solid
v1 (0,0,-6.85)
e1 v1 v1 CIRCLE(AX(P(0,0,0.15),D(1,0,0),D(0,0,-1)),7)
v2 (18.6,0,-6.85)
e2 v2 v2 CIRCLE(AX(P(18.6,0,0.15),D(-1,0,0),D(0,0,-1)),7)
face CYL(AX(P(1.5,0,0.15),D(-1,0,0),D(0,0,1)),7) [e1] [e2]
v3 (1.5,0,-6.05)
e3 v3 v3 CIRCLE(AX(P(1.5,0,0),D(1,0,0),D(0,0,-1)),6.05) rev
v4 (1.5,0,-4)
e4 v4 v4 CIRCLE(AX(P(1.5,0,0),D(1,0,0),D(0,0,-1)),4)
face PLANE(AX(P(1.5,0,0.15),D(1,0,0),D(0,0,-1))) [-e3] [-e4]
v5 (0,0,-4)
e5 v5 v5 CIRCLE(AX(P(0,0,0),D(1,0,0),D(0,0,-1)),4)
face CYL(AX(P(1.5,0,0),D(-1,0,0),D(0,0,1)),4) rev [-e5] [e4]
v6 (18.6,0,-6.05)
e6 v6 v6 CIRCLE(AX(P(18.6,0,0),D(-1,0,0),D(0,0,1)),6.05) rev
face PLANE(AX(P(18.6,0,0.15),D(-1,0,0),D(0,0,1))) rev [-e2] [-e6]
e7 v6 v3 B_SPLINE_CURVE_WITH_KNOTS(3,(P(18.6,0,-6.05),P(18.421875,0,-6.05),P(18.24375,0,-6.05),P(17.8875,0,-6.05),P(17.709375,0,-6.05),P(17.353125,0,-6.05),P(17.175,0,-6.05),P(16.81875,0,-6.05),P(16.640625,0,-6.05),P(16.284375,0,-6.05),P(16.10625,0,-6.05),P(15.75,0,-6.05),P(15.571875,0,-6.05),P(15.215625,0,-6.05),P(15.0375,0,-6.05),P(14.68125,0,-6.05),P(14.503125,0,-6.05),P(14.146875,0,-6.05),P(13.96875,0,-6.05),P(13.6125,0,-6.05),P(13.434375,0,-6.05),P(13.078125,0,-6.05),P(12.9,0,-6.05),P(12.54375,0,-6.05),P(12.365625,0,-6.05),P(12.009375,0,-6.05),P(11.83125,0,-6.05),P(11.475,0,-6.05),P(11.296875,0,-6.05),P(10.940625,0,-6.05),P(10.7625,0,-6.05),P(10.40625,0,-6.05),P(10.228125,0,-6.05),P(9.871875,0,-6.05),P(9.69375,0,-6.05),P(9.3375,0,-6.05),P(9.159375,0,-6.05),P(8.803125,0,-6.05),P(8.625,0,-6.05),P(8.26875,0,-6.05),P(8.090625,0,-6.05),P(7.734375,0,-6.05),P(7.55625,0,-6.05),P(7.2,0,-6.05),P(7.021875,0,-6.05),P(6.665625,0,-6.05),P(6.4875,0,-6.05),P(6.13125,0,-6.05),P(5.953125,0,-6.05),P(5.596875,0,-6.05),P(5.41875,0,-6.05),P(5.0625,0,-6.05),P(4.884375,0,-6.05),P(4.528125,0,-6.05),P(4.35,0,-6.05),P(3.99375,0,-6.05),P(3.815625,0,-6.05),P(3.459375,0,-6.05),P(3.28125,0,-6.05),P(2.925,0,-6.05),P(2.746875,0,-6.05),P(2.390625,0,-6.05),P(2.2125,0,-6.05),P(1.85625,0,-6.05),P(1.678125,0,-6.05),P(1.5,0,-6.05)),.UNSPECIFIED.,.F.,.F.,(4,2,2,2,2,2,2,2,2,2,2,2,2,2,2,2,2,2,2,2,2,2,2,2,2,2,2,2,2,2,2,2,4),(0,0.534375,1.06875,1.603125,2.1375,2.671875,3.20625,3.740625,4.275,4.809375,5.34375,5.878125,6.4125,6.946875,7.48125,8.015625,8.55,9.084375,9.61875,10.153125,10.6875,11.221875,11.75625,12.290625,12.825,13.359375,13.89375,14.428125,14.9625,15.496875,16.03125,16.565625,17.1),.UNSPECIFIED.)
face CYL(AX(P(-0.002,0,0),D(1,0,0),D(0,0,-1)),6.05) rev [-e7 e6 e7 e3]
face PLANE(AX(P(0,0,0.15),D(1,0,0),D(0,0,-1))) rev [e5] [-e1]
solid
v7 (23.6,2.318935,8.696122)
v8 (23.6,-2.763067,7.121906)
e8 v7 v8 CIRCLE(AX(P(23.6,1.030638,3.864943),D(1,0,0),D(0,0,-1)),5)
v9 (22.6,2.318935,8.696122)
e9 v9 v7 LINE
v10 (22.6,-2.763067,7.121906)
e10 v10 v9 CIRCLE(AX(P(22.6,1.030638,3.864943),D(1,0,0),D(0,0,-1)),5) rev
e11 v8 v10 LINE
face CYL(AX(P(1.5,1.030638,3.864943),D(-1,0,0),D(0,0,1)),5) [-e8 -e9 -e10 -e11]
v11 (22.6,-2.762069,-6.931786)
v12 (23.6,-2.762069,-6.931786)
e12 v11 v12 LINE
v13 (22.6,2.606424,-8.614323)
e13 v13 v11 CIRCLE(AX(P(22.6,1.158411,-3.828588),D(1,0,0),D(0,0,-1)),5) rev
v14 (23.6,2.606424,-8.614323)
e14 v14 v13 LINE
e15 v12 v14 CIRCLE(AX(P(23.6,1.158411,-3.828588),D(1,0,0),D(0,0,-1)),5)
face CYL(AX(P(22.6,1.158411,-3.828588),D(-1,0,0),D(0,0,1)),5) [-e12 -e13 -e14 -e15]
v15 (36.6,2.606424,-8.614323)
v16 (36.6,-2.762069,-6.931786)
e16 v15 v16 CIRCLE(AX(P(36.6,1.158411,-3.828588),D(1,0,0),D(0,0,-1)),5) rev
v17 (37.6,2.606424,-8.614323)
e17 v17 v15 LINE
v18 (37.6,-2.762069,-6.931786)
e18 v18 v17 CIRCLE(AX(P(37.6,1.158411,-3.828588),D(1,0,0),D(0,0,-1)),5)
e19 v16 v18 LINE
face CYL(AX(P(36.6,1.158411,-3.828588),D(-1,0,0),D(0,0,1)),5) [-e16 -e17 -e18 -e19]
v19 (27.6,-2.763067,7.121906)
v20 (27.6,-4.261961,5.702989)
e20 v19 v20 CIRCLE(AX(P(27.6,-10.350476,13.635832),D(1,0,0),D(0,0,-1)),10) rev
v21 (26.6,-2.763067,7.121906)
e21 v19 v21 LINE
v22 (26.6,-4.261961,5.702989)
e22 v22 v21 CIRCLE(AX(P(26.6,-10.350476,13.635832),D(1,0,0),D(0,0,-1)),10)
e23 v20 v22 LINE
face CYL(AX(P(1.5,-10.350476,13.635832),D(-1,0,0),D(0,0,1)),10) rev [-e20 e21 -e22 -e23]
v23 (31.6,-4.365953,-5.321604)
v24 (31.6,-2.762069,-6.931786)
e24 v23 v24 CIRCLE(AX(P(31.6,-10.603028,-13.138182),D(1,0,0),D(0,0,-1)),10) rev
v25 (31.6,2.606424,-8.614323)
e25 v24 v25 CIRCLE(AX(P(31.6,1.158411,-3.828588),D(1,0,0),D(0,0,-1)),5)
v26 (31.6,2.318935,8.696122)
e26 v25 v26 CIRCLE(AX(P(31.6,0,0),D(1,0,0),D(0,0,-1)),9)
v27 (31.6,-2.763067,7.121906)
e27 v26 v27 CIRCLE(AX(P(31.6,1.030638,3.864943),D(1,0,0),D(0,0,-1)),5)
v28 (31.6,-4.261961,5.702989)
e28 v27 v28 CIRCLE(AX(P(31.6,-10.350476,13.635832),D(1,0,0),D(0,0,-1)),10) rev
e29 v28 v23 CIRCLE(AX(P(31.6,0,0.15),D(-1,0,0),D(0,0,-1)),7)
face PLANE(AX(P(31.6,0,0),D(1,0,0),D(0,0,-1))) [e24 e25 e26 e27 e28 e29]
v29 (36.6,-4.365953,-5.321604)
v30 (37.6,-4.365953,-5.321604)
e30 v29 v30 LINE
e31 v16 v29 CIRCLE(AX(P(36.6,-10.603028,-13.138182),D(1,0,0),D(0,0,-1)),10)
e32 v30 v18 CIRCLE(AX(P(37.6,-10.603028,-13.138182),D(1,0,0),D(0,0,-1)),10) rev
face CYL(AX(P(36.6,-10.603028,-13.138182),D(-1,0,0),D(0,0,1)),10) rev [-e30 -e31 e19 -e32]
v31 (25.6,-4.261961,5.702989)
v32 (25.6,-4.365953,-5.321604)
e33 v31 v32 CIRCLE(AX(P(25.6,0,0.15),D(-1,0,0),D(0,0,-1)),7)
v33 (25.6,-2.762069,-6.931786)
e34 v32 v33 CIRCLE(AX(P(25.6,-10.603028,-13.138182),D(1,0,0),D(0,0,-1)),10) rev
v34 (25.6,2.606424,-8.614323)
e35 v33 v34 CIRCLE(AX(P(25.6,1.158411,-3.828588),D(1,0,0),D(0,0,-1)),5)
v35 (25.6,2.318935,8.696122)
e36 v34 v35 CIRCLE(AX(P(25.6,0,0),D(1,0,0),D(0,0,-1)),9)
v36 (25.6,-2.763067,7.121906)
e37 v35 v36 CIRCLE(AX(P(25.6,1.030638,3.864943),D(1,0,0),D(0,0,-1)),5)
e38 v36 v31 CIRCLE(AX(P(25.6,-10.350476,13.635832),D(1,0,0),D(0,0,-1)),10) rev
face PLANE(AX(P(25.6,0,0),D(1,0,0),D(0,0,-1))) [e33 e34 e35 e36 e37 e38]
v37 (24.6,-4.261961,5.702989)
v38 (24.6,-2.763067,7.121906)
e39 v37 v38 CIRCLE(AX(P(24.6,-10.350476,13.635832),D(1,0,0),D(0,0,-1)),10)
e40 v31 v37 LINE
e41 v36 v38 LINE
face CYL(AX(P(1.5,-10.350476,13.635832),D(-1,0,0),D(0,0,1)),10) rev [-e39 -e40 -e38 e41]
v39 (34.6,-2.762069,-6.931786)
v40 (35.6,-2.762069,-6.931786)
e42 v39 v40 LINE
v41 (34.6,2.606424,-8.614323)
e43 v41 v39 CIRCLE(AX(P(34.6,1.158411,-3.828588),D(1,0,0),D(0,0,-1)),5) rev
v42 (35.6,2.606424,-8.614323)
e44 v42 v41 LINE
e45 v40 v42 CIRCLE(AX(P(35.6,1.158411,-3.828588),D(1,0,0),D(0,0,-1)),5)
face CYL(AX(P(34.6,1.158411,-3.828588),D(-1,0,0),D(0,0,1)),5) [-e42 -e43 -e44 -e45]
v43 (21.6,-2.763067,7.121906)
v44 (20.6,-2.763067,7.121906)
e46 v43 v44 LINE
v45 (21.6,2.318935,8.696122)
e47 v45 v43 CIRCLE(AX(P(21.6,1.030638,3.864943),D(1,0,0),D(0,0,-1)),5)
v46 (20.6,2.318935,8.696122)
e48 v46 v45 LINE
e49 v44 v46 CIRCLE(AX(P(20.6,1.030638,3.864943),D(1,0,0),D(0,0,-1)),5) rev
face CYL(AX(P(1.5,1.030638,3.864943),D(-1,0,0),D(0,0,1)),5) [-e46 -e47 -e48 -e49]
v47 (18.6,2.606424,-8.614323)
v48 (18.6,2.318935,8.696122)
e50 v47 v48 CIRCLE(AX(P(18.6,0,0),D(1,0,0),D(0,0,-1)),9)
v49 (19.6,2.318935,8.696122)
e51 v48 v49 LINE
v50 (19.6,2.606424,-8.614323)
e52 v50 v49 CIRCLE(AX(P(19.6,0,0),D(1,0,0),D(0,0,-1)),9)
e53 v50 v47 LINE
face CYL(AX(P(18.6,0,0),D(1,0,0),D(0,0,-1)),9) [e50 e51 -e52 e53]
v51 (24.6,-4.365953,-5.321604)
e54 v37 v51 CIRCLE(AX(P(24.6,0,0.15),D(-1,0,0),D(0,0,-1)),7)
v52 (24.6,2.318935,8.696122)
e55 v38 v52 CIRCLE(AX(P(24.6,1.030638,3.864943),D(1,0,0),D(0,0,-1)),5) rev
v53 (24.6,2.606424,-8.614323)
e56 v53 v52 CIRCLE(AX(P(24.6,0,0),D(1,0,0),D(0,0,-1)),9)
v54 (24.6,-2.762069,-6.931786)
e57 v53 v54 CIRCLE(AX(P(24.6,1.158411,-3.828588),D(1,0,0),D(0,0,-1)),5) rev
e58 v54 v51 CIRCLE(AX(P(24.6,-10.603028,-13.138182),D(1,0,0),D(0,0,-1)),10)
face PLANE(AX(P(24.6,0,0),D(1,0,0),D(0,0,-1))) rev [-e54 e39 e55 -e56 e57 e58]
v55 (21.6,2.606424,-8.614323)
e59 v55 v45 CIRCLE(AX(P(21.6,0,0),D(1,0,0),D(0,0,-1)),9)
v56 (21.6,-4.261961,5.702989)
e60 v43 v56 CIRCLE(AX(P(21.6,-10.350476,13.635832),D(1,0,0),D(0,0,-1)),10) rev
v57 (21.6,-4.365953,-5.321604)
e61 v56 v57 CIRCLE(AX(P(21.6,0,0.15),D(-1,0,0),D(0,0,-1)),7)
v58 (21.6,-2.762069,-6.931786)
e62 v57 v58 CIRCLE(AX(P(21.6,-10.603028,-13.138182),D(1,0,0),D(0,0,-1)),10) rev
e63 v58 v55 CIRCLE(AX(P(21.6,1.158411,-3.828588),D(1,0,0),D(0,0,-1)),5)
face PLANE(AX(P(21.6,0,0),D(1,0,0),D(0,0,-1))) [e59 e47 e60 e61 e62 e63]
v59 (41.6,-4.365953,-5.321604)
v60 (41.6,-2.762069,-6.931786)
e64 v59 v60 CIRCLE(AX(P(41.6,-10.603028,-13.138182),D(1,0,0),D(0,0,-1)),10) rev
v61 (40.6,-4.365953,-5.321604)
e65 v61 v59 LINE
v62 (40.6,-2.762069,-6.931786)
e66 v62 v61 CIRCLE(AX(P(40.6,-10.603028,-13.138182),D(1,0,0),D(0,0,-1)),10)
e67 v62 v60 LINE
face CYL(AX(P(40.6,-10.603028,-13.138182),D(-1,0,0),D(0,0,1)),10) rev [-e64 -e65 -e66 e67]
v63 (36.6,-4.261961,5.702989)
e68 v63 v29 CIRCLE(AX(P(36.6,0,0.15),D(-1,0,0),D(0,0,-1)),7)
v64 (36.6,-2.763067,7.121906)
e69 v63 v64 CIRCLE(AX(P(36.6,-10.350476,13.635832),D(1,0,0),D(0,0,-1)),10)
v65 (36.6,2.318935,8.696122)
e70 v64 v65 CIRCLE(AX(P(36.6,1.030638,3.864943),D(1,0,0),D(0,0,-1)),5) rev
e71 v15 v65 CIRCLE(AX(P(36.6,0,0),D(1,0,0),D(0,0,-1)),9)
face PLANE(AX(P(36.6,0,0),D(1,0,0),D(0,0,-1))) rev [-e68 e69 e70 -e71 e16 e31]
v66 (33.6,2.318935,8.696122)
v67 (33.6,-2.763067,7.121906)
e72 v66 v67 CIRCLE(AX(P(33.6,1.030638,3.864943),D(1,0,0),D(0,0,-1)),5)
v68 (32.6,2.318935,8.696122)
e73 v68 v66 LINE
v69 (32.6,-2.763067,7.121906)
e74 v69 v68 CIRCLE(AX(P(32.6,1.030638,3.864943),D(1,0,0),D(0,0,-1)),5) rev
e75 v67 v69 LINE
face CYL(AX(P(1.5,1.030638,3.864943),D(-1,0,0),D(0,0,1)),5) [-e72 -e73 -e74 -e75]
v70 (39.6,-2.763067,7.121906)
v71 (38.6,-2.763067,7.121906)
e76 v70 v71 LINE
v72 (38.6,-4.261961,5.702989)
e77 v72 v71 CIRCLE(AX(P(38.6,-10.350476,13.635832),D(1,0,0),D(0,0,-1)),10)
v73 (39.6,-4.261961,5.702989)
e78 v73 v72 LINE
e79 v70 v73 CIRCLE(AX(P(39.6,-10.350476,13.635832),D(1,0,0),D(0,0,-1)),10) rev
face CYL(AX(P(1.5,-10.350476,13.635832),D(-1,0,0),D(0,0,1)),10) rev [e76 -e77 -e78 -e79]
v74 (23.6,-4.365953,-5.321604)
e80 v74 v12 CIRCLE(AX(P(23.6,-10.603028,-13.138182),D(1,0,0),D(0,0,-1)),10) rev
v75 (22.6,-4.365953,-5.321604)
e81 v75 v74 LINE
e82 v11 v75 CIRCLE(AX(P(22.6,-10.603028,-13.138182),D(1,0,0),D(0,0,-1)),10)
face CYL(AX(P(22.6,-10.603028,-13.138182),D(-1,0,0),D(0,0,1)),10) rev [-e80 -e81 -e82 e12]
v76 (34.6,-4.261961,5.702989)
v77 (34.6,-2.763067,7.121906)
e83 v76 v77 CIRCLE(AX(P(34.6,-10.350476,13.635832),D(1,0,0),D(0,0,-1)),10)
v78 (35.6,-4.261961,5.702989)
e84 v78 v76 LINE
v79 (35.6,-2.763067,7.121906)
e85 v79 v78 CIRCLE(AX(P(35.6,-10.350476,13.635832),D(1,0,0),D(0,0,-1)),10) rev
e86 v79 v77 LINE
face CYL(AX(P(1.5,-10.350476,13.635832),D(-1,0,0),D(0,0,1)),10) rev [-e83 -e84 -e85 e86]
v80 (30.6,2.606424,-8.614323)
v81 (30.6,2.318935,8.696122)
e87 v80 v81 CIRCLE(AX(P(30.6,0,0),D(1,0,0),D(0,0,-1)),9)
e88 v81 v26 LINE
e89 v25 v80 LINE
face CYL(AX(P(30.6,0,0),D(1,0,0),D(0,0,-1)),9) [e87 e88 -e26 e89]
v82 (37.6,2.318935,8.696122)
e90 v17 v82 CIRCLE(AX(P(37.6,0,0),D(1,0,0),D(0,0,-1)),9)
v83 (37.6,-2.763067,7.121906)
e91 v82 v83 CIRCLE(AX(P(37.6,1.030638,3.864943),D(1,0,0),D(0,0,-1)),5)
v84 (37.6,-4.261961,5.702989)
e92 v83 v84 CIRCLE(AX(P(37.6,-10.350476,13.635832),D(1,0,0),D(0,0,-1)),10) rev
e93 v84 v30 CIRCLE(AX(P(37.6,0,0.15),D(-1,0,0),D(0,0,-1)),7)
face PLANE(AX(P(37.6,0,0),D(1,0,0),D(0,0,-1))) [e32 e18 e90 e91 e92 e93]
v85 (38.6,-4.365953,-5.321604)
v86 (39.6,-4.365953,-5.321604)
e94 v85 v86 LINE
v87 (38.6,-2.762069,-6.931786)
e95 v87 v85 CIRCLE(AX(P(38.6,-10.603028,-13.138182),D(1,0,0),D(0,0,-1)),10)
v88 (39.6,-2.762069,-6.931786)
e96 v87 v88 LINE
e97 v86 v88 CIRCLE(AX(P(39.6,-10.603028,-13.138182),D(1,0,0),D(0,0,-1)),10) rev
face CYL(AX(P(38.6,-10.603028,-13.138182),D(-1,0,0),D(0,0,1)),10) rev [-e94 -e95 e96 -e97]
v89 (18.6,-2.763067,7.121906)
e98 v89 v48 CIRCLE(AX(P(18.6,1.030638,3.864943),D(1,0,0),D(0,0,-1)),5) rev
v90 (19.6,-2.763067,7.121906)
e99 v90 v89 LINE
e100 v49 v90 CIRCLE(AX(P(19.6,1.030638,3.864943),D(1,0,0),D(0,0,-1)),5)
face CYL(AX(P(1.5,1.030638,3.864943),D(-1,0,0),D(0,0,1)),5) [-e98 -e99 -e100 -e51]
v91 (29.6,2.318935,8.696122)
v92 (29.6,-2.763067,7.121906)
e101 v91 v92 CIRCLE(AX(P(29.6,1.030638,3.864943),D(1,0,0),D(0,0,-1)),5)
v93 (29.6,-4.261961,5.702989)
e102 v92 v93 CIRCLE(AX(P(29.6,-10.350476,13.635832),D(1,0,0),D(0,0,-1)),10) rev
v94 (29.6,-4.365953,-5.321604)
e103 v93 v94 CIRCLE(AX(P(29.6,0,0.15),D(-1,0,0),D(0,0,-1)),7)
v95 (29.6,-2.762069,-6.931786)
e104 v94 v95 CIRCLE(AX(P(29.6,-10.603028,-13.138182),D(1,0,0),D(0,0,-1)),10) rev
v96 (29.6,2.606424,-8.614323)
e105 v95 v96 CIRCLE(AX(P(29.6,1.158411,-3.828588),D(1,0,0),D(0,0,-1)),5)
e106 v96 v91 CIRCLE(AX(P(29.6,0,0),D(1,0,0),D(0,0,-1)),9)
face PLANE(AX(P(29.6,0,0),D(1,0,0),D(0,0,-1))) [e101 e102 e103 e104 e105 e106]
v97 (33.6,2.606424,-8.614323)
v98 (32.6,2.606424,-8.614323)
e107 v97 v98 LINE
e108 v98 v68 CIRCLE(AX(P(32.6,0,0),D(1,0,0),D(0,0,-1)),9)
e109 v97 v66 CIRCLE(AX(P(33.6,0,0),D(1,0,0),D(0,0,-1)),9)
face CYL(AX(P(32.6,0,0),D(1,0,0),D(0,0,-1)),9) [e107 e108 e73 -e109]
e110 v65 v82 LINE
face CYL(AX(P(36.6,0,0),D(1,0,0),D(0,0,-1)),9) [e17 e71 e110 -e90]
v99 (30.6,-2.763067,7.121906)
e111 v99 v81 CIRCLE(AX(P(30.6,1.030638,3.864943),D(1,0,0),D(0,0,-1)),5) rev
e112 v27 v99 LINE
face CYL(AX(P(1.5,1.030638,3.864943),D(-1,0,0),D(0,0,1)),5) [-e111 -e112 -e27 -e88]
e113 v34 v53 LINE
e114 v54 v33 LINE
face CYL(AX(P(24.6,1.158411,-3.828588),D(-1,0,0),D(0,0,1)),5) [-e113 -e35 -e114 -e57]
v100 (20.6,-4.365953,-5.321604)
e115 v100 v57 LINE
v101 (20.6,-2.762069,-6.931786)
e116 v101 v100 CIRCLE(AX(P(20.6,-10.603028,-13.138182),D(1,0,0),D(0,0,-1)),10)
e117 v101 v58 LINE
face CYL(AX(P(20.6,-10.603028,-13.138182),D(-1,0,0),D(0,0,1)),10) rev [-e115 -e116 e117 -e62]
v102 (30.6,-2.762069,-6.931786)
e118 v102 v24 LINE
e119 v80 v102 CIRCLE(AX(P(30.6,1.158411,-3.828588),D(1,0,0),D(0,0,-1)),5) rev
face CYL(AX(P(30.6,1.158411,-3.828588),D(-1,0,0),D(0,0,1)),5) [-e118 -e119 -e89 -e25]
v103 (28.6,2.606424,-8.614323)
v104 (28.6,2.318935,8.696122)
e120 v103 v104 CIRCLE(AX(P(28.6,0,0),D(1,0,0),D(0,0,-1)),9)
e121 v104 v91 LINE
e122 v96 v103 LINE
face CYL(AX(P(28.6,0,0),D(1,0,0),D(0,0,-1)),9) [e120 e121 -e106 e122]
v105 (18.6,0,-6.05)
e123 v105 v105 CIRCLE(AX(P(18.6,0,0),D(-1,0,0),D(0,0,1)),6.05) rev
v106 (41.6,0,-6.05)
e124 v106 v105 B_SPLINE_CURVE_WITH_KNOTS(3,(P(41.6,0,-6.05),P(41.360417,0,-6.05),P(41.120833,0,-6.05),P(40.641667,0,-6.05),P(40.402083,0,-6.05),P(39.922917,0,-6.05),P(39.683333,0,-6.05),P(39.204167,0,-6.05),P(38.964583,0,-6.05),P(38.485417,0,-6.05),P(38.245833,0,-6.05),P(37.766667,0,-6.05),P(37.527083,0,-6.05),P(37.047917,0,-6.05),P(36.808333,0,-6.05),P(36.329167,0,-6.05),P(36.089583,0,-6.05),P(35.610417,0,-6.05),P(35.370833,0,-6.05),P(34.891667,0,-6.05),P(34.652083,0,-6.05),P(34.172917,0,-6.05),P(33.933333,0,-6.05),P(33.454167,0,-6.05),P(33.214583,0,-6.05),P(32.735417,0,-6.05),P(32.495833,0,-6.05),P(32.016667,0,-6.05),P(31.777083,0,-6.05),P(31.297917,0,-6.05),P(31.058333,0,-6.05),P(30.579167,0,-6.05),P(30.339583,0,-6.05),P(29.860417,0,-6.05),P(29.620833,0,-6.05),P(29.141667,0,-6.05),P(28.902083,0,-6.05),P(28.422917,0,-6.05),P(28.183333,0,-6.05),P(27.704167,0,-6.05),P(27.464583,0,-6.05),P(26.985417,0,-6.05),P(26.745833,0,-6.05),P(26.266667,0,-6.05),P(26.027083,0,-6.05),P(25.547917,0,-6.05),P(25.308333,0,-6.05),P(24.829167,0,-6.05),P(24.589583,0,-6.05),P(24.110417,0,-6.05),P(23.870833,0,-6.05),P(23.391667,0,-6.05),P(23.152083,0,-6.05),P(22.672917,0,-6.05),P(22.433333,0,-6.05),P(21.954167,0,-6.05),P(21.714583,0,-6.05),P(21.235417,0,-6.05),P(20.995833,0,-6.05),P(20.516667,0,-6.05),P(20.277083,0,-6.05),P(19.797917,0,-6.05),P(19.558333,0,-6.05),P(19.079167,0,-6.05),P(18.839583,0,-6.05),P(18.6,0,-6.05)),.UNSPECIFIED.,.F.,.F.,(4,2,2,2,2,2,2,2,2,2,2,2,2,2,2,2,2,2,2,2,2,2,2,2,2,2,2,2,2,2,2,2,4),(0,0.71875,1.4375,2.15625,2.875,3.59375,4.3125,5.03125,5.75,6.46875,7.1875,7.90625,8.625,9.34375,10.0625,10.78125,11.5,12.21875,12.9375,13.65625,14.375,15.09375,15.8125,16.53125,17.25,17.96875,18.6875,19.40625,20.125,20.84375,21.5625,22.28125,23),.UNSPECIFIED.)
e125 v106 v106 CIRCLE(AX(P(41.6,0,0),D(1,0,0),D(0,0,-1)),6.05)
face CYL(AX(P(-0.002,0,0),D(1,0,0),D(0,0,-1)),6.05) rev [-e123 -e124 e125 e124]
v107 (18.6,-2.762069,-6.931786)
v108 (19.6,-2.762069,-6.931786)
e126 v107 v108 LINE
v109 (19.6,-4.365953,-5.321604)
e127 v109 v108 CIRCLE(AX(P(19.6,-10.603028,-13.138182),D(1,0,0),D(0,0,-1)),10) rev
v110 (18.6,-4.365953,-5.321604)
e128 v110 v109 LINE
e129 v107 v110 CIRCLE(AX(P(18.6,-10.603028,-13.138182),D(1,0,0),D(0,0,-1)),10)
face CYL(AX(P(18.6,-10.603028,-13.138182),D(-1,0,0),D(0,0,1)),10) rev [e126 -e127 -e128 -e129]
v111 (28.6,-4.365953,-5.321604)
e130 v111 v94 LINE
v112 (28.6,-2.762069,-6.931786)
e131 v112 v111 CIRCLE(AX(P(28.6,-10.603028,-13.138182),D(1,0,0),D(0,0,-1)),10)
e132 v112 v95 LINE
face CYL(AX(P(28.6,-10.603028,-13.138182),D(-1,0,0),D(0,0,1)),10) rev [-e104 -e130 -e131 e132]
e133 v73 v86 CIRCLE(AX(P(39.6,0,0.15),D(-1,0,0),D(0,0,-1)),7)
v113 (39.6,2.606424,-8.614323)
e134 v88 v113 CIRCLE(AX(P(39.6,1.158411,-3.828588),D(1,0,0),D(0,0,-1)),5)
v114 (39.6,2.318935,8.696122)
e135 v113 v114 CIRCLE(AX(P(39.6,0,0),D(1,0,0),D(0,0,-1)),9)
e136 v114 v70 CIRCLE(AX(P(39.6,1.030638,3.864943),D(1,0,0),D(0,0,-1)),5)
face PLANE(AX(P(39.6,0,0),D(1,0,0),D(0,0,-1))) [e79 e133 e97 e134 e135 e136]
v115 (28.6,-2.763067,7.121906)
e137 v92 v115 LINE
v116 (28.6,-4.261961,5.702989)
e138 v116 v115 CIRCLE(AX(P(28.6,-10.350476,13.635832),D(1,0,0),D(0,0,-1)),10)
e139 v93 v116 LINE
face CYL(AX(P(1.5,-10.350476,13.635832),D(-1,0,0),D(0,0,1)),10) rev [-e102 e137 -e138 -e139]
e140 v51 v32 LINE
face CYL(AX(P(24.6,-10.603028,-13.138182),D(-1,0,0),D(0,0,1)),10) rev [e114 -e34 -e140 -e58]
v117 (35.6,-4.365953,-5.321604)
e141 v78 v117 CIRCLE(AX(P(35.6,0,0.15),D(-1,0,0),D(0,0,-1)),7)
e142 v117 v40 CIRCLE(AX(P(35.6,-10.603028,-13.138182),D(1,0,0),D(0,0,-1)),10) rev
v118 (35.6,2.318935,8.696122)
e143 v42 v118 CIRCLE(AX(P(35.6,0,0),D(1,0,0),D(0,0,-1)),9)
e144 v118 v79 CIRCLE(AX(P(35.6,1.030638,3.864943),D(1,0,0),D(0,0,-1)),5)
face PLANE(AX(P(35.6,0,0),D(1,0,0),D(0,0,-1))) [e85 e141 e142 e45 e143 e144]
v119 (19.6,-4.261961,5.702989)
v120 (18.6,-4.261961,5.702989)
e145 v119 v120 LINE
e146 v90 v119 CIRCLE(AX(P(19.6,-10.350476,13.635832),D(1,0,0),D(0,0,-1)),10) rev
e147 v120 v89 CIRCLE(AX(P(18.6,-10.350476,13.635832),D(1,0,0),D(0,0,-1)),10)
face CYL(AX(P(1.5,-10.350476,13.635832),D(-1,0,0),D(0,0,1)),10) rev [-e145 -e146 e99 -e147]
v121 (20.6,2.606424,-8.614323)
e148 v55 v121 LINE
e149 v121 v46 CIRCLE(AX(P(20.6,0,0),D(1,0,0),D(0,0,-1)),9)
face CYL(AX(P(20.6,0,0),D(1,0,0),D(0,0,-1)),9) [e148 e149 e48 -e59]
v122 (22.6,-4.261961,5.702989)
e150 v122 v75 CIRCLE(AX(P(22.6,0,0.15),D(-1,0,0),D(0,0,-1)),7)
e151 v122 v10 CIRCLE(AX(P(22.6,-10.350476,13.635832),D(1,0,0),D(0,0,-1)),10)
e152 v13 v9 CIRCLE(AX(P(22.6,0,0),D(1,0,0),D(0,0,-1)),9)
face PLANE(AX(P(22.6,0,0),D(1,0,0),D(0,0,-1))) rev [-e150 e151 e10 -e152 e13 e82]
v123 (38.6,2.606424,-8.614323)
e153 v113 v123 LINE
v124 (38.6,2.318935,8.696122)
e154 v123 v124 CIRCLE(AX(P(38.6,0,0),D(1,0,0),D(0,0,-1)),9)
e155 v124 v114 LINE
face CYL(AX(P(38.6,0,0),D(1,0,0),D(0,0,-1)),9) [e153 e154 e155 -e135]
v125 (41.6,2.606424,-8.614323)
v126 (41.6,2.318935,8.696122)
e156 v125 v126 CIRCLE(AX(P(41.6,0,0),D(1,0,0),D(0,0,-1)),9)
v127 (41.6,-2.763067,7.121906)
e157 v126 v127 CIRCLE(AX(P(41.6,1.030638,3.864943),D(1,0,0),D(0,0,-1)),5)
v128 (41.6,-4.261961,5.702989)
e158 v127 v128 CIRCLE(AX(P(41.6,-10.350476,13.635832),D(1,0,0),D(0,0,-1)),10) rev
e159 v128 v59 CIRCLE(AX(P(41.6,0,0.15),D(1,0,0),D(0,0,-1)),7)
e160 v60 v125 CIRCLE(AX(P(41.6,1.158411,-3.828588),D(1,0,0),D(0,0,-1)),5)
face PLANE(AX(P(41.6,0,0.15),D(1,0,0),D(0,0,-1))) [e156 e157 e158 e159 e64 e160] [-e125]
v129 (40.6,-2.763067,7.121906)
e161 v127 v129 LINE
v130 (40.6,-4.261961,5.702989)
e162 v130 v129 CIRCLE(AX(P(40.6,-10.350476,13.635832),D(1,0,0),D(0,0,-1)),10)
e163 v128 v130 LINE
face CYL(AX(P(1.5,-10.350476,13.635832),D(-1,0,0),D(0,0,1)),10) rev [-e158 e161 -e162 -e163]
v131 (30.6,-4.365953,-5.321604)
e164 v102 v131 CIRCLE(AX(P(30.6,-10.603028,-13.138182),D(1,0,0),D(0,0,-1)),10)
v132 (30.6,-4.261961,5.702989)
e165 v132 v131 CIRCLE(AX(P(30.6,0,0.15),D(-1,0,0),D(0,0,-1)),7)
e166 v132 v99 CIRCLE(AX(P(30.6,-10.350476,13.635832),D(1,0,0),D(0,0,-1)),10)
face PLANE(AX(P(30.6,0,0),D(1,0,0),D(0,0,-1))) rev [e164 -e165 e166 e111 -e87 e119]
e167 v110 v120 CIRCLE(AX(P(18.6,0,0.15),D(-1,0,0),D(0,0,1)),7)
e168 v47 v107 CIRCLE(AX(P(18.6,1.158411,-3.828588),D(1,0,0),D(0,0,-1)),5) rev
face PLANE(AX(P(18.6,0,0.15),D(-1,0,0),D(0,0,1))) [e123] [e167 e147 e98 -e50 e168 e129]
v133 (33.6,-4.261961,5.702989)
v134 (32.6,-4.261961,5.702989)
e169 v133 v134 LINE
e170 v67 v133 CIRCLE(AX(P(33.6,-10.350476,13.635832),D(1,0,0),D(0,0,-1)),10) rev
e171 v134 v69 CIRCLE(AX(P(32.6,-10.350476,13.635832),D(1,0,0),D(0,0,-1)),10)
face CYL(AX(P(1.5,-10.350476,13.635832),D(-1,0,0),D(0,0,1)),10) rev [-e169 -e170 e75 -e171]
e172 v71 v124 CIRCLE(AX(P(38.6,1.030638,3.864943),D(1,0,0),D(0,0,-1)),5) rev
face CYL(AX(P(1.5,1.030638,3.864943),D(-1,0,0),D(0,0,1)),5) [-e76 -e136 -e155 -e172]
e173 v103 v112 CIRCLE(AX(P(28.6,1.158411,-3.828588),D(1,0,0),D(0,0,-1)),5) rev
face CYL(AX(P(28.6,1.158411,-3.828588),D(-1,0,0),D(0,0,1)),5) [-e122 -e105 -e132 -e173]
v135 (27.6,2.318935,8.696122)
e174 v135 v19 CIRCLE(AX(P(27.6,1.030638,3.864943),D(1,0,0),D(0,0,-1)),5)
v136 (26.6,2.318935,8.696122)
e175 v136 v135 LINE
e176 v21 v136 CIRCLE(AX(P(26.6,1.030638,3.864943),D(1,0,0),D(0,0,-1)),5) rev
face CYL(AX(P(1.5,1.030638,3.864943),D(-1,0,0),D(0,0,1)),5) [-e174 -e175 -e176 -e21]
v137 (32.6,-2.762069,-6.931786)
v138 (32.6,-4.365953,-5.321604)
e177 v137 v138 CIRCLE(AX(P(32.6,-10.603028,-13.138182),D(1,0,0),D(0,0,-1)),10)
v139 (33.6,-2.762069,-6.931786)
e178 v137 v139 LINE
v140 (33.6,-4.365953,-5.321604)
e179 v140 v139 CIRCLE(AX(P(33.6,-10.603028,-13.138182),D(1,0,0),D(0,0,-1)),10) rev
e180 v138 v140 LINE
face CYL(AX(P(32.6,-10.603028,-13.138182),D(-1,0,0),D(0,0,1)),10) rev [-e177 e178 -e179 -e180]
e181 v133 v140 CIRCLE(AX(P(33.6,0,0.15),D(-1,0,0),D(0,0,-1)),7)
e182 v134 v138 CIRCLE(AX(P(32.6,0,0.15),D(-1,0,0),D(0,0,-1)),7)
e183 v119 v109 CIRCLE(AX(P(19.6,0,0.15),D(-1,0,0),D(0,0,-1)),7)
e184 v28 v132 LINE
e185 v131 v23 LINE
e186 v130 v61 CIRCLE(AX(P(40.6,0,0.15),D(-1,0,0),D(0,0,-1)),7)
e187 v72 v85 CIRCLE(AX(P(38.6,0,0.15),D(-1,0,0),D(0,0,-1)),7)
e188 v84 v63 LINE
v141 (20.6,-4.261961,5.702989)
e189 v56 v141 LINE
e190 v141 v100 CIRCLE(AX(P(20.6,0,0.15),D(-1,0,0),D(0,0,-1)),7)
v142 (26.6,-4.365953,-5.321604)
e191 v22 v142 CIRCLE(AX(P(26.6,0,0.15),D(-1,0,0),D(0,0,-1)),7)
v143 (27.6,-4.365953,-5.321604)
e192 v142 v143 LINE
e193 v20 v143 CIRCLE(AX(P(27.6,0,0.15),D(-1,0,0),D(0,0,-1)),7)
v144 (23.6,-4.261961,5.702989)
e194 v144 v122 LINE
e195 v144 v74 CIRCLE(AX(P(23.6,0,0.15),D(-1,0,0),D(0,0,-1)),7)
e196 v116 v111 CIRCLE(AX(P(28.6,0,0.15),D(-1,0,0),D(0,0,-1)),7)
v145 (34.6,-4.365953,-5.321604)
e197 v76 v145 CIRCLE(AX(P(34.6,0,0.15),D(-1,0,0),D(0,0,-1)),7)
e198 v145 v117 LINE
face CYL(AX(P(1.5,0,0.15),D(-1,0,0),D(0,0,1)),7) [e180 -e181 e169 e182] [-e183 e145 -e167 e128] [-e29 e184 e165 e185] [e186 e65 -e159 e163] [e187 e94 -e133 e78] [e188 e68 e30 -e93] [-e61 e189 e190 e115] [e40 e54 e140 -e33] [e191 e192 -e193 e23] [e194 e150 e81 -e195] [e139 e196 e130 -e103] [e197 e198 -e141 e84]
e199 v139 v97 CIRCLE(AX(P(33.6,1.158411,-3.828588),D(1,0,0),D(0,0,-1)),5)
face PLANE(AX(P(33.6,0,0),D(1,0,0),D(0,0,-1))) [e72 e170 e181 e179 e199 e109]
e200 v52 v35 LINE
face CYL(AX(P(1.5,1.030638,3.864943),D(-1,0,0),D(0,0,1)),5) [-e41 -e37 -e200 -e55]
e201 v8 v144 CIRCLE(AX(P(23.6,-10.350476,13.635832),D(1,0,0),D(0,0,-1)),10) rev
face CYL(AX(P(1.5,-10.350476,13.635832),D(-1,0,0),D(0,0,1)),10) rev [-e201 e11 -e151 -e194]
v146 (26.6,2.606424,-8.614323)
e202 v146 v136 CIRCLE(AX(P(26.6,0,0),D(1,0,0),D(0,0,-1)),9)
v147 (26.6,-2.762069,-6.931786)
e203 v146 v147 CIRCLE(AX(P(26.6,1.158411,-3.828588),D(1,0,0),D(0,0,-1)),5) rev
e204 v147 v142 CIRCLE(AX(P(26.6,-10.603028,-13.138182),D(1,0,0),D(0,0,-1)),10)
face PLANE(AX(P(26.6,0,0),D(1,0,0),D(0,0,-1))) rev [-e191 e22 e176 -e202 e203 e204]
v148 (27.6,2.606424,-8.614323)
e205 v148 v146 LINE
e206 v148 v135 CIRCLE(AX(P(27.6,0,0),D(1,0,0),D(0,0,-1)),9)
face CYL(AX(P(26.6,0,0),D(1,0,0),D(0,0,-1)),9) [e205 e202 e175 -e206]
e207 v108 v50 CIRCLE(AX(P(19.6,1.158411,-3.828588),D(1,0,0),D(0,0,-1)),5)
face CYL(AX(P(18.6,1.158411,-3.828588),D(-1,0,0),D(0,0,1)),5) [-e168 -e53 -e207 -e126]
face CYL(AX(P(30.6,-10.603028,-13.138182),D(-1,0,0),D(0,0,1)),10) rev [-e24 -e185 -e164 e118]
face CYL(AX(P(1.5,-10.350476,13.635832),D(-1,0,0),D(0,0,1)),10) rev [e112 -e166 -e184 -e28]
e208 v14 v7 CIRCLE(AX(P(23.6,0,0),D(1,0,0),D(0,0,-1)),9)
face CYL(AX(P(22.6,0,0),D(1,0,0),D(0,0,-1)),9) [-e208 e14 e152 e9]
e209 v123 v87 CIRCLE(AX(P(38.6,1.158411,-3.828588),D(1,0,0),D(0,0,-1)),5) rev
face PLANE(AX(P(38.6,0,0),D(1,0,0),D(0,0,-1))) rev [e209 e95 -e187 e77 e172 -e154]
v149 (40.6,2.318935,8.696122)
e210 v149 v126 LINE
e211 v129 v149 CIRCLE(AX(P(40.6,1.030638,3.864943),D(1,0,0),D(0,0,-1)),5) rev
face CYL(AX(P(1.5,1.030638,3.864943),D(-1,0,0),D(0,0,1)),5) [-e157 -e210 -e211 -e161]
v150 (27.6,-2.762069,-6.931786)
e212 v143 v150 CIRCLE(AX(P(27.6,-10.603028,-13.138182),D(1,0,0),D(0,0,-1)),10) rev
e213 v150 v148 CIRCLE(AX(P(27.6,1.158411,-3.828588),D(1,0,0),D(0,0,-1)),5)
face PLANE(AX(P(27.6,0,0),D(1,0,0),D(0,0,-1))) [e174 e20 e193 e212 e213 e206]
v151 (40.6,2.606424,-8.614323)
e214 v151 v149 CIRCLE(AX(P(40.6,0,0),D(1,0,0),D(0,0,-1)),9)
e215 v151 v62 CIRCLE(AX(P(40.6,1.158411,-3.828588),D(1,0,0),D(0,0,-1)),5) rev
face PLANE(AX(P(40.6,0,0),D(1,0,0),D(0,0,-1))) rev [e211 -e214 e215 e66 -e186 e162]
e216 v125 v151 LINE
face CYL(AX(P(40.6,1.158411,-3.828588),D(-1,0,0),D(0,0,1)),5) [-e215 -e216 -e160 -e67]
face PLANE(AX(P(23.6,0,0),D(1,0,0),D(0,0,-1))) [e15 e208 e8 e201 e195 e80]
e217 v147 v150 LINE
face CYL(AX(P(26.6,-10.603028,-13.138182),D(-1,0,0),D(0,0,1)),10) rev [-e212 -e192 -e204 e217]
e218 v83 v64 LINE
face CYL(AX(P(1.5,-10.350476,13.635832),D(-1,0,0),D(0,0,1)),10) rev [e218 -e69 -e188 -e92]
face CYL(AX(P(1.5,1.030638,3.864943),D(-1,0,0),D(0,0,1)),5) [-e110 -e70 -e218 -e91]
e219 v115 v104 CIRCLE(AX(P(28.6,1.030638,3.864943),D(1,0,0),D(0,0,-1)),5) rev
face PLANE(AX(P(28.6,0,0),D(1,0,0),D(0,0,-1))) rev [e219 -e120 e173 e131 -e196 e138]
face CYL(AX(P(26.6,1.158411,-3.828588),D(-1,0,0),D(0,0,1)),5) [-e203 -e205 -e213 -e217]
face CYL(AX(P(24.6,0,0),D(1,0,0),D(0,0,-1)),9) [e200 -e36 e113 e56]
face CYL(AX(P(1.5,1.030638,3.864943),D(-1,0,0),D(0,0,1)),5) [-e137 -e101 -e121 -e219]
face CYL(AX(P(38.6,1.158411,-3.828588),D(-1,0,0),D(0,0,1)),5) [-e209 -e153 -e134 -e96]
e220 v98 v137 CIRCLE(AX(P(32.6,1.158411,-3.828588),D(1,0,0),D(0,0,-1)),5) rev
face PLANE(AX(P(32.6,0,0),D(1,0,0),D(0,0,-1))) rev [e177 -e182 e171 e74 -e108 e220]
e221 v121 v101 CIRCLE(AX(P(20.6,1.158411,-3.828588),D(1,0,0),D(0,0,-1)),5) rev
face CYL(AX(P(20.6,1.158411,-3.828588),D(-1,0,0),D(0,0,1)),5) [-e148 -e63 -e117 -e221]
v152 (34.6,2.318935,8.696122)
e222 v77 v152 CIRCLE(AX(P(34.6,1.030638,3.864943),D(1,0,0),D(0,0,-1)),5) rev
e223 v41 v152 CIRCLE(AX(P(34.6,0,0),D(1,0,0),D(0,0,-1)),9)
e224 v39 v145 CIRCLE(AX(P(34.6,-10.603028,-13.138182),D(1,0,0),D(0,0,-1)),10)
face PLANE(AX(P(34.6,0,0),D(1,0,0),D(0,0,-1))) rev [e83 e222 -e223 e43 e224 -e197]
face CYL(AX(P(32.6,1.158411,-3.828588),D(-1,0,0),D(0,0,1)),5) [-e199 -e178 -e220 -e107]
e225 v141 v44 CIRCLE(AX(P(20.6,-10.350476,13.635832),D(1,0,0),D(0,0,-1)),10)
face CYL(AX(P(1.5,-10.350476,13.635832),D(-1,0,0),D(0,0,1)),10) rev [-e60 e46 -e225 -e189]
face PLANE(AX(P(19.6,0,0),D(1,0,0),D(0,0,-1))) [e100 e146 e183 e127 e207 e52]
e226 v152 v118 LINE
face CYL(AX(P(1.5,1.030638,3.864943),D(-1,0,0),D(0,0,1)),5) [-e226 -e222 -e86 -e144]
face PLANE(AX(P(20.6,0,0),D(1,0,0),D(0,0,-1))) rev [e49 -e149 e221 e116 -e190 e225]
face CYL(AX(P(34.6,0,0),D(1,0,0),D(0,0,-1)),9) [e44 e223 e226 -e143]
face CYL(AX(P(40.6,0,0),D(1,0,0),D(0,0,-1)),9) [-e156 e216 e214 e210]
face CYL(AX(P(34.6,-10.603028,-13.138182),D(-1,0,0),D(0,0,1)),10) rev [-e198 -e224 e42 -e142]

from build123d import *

# Parameters (mm, degrees)
SKETCH1_R           = 7
SKETCH1_R_2         = 4
BOSS_EXTRUDE1_DEPTH = 1.5
SKETCH2_R           = 7
SKETCH2_R_2         = 6.4
BOSS_EXTRUDE2_DEPTH = 40.1
BOSS_EXTRUDE5_REACH = 44.786
SKETCH12_R          = 6.4
SKETCH12_R_2        = 6.05
BOSS_EXTRUDE7_START = -1
BOSS_EXTRUDE7_DEPTH = 1
FILLET2_R           = 10
FILLET3_R           = 5
LPATTERN1_START     = 18.6
LPATTERN1_DEPTH     = 1
LPATTERN1_START_2   = 20.6
LPATTERN1_2_DEPTH   = 1
LPATTERN1_START_3   = 22.6
LPATTERN1_3_DEPTH   = 1
LPATTERN1_START_4   = 24.6
LPATTERN1_4_DEPTH   = 1
LPATTERN1_START_5   = 26.6
LPATTERN1_5_DEPTH   = 1
LPATTERN1_START_6   = 28.6
LPATTERN1_6_DEPTH   = 1
LPATTERN1_START_7   = 30.6
LPATTERN1_7_DEPTH   = 1
LPATTERN1_START_8   = 32.6
LPATTERN1_8_DEPTH   = 1
LPATTERN1_START_9   = 34.6
LPATTERN1_9_DEPTH   = 1
LPATTERN1_START_10  = 36.6
LPATTERN1_10_DEPTH  = 1
LPATTERN1_START_11  = 38.6
LPATTERN1_11_DEPTH  = 1
SKETCH15_R          = 7


# Read off the part's stored shape, not the designer's step: LPattern1
with BuildPart() as part:
    # Sketch1 → Boss-Extrude1 (new body)
    with BuildSketch(Plane(origin=(0, 0, 0), x_dir=(0, 0, -1), z_dir=(1, 0, 0))):
        with Locations((-0.15, 0)):
            Circle(SKETCH1_R)
        Circle(SKETCH1_R_2, mode=Mode.SUBTRACT)
    extrude(amount=BOSS_EXTRUDE1_DEPTH)

    # Sketch2 → Boss-Extrude2 (add)
    with BuildSketch(Plane(origin=(1.5, 0, 0), x_dir=(0, 0, -1), z_dir=(1, 0, 0))):
        with Locations((-0.15, 0)):
            Circle(SKETCH2_R)
        with Locations((-0.15, 0)):
            Circle(SKETCH2_R_2, mode=Mode.SUBTRACT)
    extrude(amount=BOSS_EXTRUDE2_DEPTH)

    # Sketch12 → Boss-Extrude5 (add, up to next)
    with BuildSketch(Plane(origin=(41.6, 0, 0), x_dir=(0, 0, -1), z_dir=(1, 0, 0)), mode=Mode.PRIVATE) as boss_extrude5_sk1:
        with Locations((-0.15, 0)):
            Circle(SKETCH12_R)
        Circle(SKETCH12_R_2, mode=Mode.SUBTRACT)
    boss_extrude5_tool1 = extrude(boss_extrude5_sk1.sketch, amount=-BOSS_EXTRUDE5_REACH, mode=Mode.PRIVATE) - part.part
    add(boss_extrude5_tool1.solids().sort_by_distance((41.6, 0, 6.368981))[0])

    # Sketch14 → Boss-Extrude7 (add)
    with BuildSketch(Plane(origin=(41.6, 0, 0), x_dir=(0, 0, -1), z_dir=(1, 0, 0)).offset(BOSS_EXTRUDE7_START)):
        with BuildLine():
            Line((-7.039083492, -1.241180339), (-8.863269777, -1.562833599))
            ThreePointArc((-8.863269777, -1.562833599), (0, 9), (8.863269777, -1.562833599))
            Line((8.863269777, -1.562833599), (6.748129599, -1.189877318))
            ThreePointArc((6.748129599, -1.189877318), (-0.176047227, 6.999951539), (-7.039083492, -1.241180339))
        make_face()
    extrude(amount=BOSS_EXTRUDE7_DEPTH)

    # Fillet2
    # the kernel refuses this fillet: 10 mm, written as the material it adds along each edge
    with BuildSketch(Plane(origin=(40.6, -1.189877318, -6.748129599), x_dir=(0, -0.9122124275498228, 0.409717569825434), z_dir=(1, 0, 0))) as fillet2_piece_1:
        with BuildLine():
            CenterArc((5.968676638, 9.685818843), FILLET2_R, 229.495547536, 26.104158306)
            Line((-0.526394739, 2.082263897), (-0.656296166, 1.930192799))
            ThreePointArc((-0.656296166, 1.930192799), (-0.457097485, 0.992114146), (-0.193900116, -0.049017803))
            Line((-0.193900116, -0.049017803), (0.049738972, -0.193716377))
            ThreePointArc((0.049738972, -0.193716377), (1.740864019, 0.01992681), (3.431989067, -0.193716377))
            Line((3.431989067, -0.193716377), (3.481728039, 0))
        make_face()
    extrude(amount=1)
    with BuildSketch(Plane(origin=(40.6, -1.241180339, 7.039083492), x_dir=(0, -0.9145376119425217, -0.4045008731047063), z_dir=(1, 0, 0))) as fillet2_piece_2:
        with BuildLine():
            CenterArc((5.662402917, -9.717692138), FILLET2_R, 103.646653122, 23.987142505)
            Line((-0.443720941, -1.798395993), (-0.565843418, -1.64001007))
            ThreePointArc((-0.565843418, -1.64001007), (-0.416037384, -0.851288435), (-0.194176914, 0.047909561))
            Line((-0.194176914, 0.047909561), (0.047186691, 0.194353843))
            ThreePointArc((0.047186691, 0.194353843), (1.651534184, 0.002384497), (3.255881677, 0.194353843))
            Line((3.255881677, 0.194353843), (3.303068368, 0))
        make_face()
    extrude(amount=1)

    # Fillet3
    fillet3_edges = [part.edges().sort_by_distance(p)[0] for p in [
        (41.1, -1.562833599, 8.863269777),
        (41.1, -1.562833599, -8.863269777),
    ]]
    fillet(fillet3_edges, radius=FILLET3_R)

    # LPattern1 outline → LPattern1 (add)
    with BuildSketch(Plane.YZ.offset(LPATTERN1_START)):
        with BuildLine():
            ThreePointArc((-2.762069023, -6.931785952), (-0.336916962, -8.599750686), (2.606424088, -8.614322578))
            ThreePointArc((2.606424088, -8.614322578), (8.998759062, 0.149450112), (2.31893468, 8.696122236))
            ThreePointArc((2.31893468, 8.696122236), (-0.448823677, 8.641049813), (-2.763066821, 7.121905987))
            ThreePointArc((-2.763066821, 7.121905987), (-3.475808056, 6.373673153), (-4.261960597, 5.702989453))
            ThreePointArc((-4.261960597, 5.702989453), (6.999688602, 0.083973644), (-4.365952904, -5.321604449))
            ThreePointArc((-4.365952904, -5.321604449), (-3.518119256, -6.080982981), (-2.762069023, -6.931785952))
        make_face()
    extrude(amount=LPATTERN1_DEPTH)

    # LPattern1 2 outline → LPattern1 2 (add)
    with BuildSketch(Plane.YZ.offset(LPATTERN1_START_2)):
        with BuildLine():
            ThreePointArc((-2.762069023, -6.931785952), (-0.336916962, -8.599750686), (2.606424088, -8.614322578))
            ThreePointArc((2.606424088, -8.614322578), (8.998759062, 0.149450112), (2.31893468, 8.696122236))
            ThreePointArc((2.31893468, 8.696122236), (-0.448823677, 8.641049813), (-2.763066821, 7.121905987))
            ThreePointArc((-2.763066821, 7.121905987), (-3.475808056, 6.373673153), (-4.261960597, 5.702989453))
            ThreePointArc((-4.261960597, 5.702989453), (6.999688602, 0.083973644), (-4.365952904, -5.321604449))
            ThreePointArc((-4.365952904, -5.321604449), (-3.518119256, -6.080982981), (-2.762069023, -6.931785952))
        make_face()
    extrude(amount=LPATTERN1_2_DEPTH)

    # LPattern1 3 outline → LPattern1 3 (add)
    with BuildSketch(Plane.YZ.offset(LPATTERN1_START_3)):
        with BuildLine():
            ThreePointArc((-2.762069023, -6.931785952), (-0.336916962, -8.599750686), (2.606424088, -8.614322578))
            ThreePointArc((2.606424088, -8.614322578), (8.998759062, 0.149450112), (2.31893468, 8.696122236))
            ThreePointArc((2.31893468, 8.696122236), (-0.448823677, 8.641049813), (-2.763066821, 7.121905987))
            ThreePointArc((-2.763066821, 7.121905987), (-3.475808056, 6.373673153), (-4.261960597, 5.702989453))
            ThreePointArc((-4.261960597, 5.702989453), (6.999688602, 0.083973644), (-4.365952904, -5.321604449))
            ThreePointArc((-4.365952904, -5.321604449), (-3.518119256, -6.080982981), (-2.762069023, -6.931785952))
        make_face()
    extrude(amount=LPATTERN1_3_DEPTH)

    # LPattern1 4 outline → LPattern1 4 (add)
    with BuildSketch(Plane.YZ.offset(LPATTERN1_START_4)):
        with BuildLine():
            ThreePointArc((-2.762069023, -6.931785952), (-0.336916962, -8.599750686), (2.606424088, -8.614322578))
            ThreePointArc((2.606424088, -8.614322578), (8.998759062, 0.149450112), (2.31893468, 8.696122236))
            ThreePointArc((2.31893468, 8.696122236), (-0.448823677, 8.641049813), (-2.763066821, 7.121905987))
            ThreePointArc((-2.763066821, 7.121905987), (-3.475808056, 6.373673153), (-4.261960597, 5.702989453))
            ThreePointArc((-4.261960597, 5.702989453), (6.999688602, 0.083973644), (-4.365952904, -5.321604449))
            ThreePointArc((-4.365952904, -5.321604449), (-3.518119256, -6.080982981), (-2.762069023, -6.931785952))
        make_face()
    extrude(amount=LPATTERN1_4_DEPTH)

    # LPattern1 5 outline → LPattern1 5 (add)
    with BuildSketch(Plane.YZ.offset(LPATTERN1_START_5)):
        with BuildLine():
            ThreePointArc((-2.762069023, -6.931785952), (-0.336916962, -8.599750686), (2.606424088, -8.614322578))
            ThreePointArc((2.606424088, -8.614322578), (8.998759062, 0.149450112), (2.31893468, 8.696122236))
            ThreePointArc((2.31893468, 8.696122236), (-0.448823677, 8.641049813), (-2.763066821, 7.121905987))
            ThreePointArc((-2.763066821, 7.121905987), (-3.475808056, 6.373673153), (-4.261960597, 5.702989453))
            ThreePointArc((-4.261960597, 5.702989453), (6.999688602, 0.083973644), (-4.365952904, -5.321604449))
            ThreePointArc((-4.365952904, -5.321604449), (-3.518119256, -6.080982981), (-2.762069023, -6.931785952))
        make_face()
    extrude(amount=LPATTERN1_5_DEPTH)

    # LPattern1 6 outline → LPattern1 6 (add)
    with BuildSketch(Plane.YZ.offset(LPATTERN1_START_6)):
        with BuildLine():
            ThreePointArc((-2.762069023, -6.931785952), (-0.336916962, -8.599750686), (2.606424088, -8.614322578))
            ThreePointArc((2.606424088, -8.614322578), (8.998759062, 0.149450112), (2.31893468, 8.696122236))
            ThreePointArc((2.31893468, 8.696122236), (-0.448823677, 8.641049813), (-2.763066821, 7.121905987))
            ThreePointArc((-2.763066821, 7.121905987), (-3.475808056, 6.373673153), (-4.261960597, 5.702989453))
            ThreePointArc((-4.261960597, 5.702989453), (6.999688602, 0.083973644), (-4.365952904, -5.321604449))
            ThreePointArc((-4.365952904, -5.321604449), (-3.518119256, -6.080982981), (-2.762069023, -6.931785952))
        make_face()
    extrude(amount=LPATTERN1_6_DEPTH)

    # LPattern1 7 outline → LPattern1 7 (add)
    with BuildSketch(Plane.YZ.offset(LPATTERN1_START_7)):
        with BuildLine():
            ThreePointArc((-2.762069023, -6.931785952), (-0.336916962, -8.599750686), (2.606424088, -8.614322578))
            ThreePointArc((2.606424088, -8.614322578), (8.998759062, 0.149450112), (2.31893468, 8.696122236))
            ThreePointArc((2.31893468, 8.696122236), (-0.448823677, 8.641049813), (-2.763066821, 7.121905987))
            ThreePointArc((-2.763066821, 7.121905987), (-3.475808056, 6.373673153), (-4.261960597, 5.702989453))
            ThreePointArc((-4.261960597, 5.702989453), (6.999688602, 0.083973644), (-4.365952904, -5.321604449))
            ThreePointArc((-4.365952904, -5.321604449), (-3.518119256, -6.080982981), (-2.762069023, -6.931785952))
        make_face()
    extrude(amount=LPATTERN1_7_DEPTH)

    # LPattern1 8 outline → LPattern1 8 (add)
    with BuildSketch(Plane.YZ.offset(LPATTERN1_START_8)):
        with BuildLine():
            ThreePointArc((-2.762069023, -6.931785952), (-0.336916962, -8.599750686), (2.606424088, -8.614322578))
            ThreePointArc((2.606424088, -8.614322578), (8.998759062, 0.149450112), (2.31893468, 8.696122236))
            ThreePointArc((2.31893468, 8.696122236), (-0.448823677, 8.641049813), (-2.763066821, 7.121905987))
            ThreePointArc((-2.763066821, 7.121905987), (-3.475808056, 6.373673153), (-4.261960597, 5.702989453))
            ThreePointArc((-4.261960597, 5.702989453), (6.999688602, 0.083973644), (-4.365952904, -5.321604449))
            ThreePointArc((-4.365952904, -5.321604449), (-3.518119256, -6.080982981), (-2.762069023, -6.931785952))
        make_face()
    extrude(amount=LPATTERN1_8_DEPTH)

    # LPattern1 9 outline → LPattern1 9 (add)
    with BuildSketch(Plane.YZ.offset(LPATTERN1_START_9)):
        with BuildLine():
            ThreePointArc((-2.762069023, -6.931785952), (-0.336916962, -8.599750686), (2.606424088, -8.614322578))
            ThreePointArc((2.606424088, -8.614322578), (8.998759062, 0.149450112), (2.31893468, 8.696122236))
            ThreePointArc((2.31893468, 8.696122236), (-0.448823677, 8.641049813), (-2.763066821, 7.121905987))
            ThreePointArc((-2.763066821, 7.121905987), (-3.475808056, 6.373673153), (-4.261960597, 5.702989453))
            ThreePointArc((-4.261960597, 5.702989453), (6.999688602, 0.083973644), (-4.365952904, -5.321604449))
            ThreePointArc((-4.365952904, -5.321604449), (-3.518119256, -6.080982981), (-2.762069023, -6.931785952))
        make_face()
    extrude(amount=LPATTERN1_9_DEPTH)

    # LPattern1 10 outline → LPattern1 10 (add)
    with BuildSketch(Plane.YZ.offset(LPATTERN1_START_10)):
        with BuildLine():
            ThreePointArc((-2.762069023, -6.931785952), (-0.336916962, -8.599750686), (2.606424088, -8.614322578))
            ThreePointArc((2.606424088, -8.614322578), (8.998759062, 0.149450112), (2.31893468, 8.696122236))
            ThreePointArc((2.31893468, 8.696122236), (-0.448823677, 8.641049813), (-2.763066821, 7.121905987))
            ThreePointArc((-2.763066821, 7.121905987), (-3.475808056, 6.373673153), (-4.261960597, 5.702989453))
            ThreePointArc((-4.261960597, 5.702989453), (6.999688602, 0.083973644), (-4.365952904, -5.321604449))
            ThreePointArc((-4.365952904, -5.321604449), (-3.518119256, -6.080982981), (-2.762069023, -6.931785952))
        make_face()
    extrude(amount=LPATTERN1_10_DEPTH)

    # LPattern1 11 outline → LPattern1 11 (add)
    with BuildSketch(Plane.YZ.offset(LPATTERN1_START_11)):
        with BuildLine():
            ThreePointArc((-2.762069023, -6.931785952), (-0.336916962, -8.599750686), (2.606424088, -8.614322578))
            ThreePointArc((2.606424088, -8.614322578), (8.998759062, 0.149450112), (2.31893468, 8.696122236))
            ThreePointArc((2.31893468, 8.696122236), (-0.448823677, 8.641049813), (-2.763066821, 7.121905987))
            ThreePointArc((-2.763066821, 7.121905987), (-3.475808056, 6.373673153), (-4.261960597, 5.702989453))
            ThreePointArc((-4.261960597, 5.702989453), (6.999688602, 0.083973644), (-4.365952904, -5.321604449))
            ThreePointArc((-4.365952904, -5.321604449), (-3.518119256, -6.080982981), (-2.762069023, -6.931785952))
        make_face()
    extrude(amount=LPATTERN1_11_DEPTH)


with BuildPart() as body_2:
    # Split1: the piece behind the surface
    add(part.part)
    # Sketch15 → Surface-Plane2: a flat surface bounded by the sketch
    with BuildSketch(Plane.ZY.offset(-18.6), mode=Mode.PRIVATE) as surface_plane2_1_region:
        with Locations(Location((0.15, 0, 0), (0, 0, 322.493493812))):
            Circle(SKETCH15_R)
    surface_plane2_1 = surface_plane2_1_region.sketch.faces()[0]
    split(bisect_by=surface_plane2_1, keep=Keep.BOTTOM)


with BuildPart() as part_1:
    add(part.part)

    # Split1: split by a surface, the side it looks to stays
    # Sketch15 → Surface-Plane2: a flat surface bounded by the sketch
    with BuildSketch(Plane.ZY.offset(-18.6), mode=Mode.PRIVATE) as surface_plane2_2_region:
        with Locations(Location((0.15, 0, 0), (0, 0, 322.493493812))):
            Circle(SKETCH15_R)
    surface_plane2_2 = surface_plane2_2_region.sketch.faces()[0]
    split(bisect_by=surface_plane2_2, keep=Keep.TOP)


solid = Compound([body_2.part, part_1.part])
